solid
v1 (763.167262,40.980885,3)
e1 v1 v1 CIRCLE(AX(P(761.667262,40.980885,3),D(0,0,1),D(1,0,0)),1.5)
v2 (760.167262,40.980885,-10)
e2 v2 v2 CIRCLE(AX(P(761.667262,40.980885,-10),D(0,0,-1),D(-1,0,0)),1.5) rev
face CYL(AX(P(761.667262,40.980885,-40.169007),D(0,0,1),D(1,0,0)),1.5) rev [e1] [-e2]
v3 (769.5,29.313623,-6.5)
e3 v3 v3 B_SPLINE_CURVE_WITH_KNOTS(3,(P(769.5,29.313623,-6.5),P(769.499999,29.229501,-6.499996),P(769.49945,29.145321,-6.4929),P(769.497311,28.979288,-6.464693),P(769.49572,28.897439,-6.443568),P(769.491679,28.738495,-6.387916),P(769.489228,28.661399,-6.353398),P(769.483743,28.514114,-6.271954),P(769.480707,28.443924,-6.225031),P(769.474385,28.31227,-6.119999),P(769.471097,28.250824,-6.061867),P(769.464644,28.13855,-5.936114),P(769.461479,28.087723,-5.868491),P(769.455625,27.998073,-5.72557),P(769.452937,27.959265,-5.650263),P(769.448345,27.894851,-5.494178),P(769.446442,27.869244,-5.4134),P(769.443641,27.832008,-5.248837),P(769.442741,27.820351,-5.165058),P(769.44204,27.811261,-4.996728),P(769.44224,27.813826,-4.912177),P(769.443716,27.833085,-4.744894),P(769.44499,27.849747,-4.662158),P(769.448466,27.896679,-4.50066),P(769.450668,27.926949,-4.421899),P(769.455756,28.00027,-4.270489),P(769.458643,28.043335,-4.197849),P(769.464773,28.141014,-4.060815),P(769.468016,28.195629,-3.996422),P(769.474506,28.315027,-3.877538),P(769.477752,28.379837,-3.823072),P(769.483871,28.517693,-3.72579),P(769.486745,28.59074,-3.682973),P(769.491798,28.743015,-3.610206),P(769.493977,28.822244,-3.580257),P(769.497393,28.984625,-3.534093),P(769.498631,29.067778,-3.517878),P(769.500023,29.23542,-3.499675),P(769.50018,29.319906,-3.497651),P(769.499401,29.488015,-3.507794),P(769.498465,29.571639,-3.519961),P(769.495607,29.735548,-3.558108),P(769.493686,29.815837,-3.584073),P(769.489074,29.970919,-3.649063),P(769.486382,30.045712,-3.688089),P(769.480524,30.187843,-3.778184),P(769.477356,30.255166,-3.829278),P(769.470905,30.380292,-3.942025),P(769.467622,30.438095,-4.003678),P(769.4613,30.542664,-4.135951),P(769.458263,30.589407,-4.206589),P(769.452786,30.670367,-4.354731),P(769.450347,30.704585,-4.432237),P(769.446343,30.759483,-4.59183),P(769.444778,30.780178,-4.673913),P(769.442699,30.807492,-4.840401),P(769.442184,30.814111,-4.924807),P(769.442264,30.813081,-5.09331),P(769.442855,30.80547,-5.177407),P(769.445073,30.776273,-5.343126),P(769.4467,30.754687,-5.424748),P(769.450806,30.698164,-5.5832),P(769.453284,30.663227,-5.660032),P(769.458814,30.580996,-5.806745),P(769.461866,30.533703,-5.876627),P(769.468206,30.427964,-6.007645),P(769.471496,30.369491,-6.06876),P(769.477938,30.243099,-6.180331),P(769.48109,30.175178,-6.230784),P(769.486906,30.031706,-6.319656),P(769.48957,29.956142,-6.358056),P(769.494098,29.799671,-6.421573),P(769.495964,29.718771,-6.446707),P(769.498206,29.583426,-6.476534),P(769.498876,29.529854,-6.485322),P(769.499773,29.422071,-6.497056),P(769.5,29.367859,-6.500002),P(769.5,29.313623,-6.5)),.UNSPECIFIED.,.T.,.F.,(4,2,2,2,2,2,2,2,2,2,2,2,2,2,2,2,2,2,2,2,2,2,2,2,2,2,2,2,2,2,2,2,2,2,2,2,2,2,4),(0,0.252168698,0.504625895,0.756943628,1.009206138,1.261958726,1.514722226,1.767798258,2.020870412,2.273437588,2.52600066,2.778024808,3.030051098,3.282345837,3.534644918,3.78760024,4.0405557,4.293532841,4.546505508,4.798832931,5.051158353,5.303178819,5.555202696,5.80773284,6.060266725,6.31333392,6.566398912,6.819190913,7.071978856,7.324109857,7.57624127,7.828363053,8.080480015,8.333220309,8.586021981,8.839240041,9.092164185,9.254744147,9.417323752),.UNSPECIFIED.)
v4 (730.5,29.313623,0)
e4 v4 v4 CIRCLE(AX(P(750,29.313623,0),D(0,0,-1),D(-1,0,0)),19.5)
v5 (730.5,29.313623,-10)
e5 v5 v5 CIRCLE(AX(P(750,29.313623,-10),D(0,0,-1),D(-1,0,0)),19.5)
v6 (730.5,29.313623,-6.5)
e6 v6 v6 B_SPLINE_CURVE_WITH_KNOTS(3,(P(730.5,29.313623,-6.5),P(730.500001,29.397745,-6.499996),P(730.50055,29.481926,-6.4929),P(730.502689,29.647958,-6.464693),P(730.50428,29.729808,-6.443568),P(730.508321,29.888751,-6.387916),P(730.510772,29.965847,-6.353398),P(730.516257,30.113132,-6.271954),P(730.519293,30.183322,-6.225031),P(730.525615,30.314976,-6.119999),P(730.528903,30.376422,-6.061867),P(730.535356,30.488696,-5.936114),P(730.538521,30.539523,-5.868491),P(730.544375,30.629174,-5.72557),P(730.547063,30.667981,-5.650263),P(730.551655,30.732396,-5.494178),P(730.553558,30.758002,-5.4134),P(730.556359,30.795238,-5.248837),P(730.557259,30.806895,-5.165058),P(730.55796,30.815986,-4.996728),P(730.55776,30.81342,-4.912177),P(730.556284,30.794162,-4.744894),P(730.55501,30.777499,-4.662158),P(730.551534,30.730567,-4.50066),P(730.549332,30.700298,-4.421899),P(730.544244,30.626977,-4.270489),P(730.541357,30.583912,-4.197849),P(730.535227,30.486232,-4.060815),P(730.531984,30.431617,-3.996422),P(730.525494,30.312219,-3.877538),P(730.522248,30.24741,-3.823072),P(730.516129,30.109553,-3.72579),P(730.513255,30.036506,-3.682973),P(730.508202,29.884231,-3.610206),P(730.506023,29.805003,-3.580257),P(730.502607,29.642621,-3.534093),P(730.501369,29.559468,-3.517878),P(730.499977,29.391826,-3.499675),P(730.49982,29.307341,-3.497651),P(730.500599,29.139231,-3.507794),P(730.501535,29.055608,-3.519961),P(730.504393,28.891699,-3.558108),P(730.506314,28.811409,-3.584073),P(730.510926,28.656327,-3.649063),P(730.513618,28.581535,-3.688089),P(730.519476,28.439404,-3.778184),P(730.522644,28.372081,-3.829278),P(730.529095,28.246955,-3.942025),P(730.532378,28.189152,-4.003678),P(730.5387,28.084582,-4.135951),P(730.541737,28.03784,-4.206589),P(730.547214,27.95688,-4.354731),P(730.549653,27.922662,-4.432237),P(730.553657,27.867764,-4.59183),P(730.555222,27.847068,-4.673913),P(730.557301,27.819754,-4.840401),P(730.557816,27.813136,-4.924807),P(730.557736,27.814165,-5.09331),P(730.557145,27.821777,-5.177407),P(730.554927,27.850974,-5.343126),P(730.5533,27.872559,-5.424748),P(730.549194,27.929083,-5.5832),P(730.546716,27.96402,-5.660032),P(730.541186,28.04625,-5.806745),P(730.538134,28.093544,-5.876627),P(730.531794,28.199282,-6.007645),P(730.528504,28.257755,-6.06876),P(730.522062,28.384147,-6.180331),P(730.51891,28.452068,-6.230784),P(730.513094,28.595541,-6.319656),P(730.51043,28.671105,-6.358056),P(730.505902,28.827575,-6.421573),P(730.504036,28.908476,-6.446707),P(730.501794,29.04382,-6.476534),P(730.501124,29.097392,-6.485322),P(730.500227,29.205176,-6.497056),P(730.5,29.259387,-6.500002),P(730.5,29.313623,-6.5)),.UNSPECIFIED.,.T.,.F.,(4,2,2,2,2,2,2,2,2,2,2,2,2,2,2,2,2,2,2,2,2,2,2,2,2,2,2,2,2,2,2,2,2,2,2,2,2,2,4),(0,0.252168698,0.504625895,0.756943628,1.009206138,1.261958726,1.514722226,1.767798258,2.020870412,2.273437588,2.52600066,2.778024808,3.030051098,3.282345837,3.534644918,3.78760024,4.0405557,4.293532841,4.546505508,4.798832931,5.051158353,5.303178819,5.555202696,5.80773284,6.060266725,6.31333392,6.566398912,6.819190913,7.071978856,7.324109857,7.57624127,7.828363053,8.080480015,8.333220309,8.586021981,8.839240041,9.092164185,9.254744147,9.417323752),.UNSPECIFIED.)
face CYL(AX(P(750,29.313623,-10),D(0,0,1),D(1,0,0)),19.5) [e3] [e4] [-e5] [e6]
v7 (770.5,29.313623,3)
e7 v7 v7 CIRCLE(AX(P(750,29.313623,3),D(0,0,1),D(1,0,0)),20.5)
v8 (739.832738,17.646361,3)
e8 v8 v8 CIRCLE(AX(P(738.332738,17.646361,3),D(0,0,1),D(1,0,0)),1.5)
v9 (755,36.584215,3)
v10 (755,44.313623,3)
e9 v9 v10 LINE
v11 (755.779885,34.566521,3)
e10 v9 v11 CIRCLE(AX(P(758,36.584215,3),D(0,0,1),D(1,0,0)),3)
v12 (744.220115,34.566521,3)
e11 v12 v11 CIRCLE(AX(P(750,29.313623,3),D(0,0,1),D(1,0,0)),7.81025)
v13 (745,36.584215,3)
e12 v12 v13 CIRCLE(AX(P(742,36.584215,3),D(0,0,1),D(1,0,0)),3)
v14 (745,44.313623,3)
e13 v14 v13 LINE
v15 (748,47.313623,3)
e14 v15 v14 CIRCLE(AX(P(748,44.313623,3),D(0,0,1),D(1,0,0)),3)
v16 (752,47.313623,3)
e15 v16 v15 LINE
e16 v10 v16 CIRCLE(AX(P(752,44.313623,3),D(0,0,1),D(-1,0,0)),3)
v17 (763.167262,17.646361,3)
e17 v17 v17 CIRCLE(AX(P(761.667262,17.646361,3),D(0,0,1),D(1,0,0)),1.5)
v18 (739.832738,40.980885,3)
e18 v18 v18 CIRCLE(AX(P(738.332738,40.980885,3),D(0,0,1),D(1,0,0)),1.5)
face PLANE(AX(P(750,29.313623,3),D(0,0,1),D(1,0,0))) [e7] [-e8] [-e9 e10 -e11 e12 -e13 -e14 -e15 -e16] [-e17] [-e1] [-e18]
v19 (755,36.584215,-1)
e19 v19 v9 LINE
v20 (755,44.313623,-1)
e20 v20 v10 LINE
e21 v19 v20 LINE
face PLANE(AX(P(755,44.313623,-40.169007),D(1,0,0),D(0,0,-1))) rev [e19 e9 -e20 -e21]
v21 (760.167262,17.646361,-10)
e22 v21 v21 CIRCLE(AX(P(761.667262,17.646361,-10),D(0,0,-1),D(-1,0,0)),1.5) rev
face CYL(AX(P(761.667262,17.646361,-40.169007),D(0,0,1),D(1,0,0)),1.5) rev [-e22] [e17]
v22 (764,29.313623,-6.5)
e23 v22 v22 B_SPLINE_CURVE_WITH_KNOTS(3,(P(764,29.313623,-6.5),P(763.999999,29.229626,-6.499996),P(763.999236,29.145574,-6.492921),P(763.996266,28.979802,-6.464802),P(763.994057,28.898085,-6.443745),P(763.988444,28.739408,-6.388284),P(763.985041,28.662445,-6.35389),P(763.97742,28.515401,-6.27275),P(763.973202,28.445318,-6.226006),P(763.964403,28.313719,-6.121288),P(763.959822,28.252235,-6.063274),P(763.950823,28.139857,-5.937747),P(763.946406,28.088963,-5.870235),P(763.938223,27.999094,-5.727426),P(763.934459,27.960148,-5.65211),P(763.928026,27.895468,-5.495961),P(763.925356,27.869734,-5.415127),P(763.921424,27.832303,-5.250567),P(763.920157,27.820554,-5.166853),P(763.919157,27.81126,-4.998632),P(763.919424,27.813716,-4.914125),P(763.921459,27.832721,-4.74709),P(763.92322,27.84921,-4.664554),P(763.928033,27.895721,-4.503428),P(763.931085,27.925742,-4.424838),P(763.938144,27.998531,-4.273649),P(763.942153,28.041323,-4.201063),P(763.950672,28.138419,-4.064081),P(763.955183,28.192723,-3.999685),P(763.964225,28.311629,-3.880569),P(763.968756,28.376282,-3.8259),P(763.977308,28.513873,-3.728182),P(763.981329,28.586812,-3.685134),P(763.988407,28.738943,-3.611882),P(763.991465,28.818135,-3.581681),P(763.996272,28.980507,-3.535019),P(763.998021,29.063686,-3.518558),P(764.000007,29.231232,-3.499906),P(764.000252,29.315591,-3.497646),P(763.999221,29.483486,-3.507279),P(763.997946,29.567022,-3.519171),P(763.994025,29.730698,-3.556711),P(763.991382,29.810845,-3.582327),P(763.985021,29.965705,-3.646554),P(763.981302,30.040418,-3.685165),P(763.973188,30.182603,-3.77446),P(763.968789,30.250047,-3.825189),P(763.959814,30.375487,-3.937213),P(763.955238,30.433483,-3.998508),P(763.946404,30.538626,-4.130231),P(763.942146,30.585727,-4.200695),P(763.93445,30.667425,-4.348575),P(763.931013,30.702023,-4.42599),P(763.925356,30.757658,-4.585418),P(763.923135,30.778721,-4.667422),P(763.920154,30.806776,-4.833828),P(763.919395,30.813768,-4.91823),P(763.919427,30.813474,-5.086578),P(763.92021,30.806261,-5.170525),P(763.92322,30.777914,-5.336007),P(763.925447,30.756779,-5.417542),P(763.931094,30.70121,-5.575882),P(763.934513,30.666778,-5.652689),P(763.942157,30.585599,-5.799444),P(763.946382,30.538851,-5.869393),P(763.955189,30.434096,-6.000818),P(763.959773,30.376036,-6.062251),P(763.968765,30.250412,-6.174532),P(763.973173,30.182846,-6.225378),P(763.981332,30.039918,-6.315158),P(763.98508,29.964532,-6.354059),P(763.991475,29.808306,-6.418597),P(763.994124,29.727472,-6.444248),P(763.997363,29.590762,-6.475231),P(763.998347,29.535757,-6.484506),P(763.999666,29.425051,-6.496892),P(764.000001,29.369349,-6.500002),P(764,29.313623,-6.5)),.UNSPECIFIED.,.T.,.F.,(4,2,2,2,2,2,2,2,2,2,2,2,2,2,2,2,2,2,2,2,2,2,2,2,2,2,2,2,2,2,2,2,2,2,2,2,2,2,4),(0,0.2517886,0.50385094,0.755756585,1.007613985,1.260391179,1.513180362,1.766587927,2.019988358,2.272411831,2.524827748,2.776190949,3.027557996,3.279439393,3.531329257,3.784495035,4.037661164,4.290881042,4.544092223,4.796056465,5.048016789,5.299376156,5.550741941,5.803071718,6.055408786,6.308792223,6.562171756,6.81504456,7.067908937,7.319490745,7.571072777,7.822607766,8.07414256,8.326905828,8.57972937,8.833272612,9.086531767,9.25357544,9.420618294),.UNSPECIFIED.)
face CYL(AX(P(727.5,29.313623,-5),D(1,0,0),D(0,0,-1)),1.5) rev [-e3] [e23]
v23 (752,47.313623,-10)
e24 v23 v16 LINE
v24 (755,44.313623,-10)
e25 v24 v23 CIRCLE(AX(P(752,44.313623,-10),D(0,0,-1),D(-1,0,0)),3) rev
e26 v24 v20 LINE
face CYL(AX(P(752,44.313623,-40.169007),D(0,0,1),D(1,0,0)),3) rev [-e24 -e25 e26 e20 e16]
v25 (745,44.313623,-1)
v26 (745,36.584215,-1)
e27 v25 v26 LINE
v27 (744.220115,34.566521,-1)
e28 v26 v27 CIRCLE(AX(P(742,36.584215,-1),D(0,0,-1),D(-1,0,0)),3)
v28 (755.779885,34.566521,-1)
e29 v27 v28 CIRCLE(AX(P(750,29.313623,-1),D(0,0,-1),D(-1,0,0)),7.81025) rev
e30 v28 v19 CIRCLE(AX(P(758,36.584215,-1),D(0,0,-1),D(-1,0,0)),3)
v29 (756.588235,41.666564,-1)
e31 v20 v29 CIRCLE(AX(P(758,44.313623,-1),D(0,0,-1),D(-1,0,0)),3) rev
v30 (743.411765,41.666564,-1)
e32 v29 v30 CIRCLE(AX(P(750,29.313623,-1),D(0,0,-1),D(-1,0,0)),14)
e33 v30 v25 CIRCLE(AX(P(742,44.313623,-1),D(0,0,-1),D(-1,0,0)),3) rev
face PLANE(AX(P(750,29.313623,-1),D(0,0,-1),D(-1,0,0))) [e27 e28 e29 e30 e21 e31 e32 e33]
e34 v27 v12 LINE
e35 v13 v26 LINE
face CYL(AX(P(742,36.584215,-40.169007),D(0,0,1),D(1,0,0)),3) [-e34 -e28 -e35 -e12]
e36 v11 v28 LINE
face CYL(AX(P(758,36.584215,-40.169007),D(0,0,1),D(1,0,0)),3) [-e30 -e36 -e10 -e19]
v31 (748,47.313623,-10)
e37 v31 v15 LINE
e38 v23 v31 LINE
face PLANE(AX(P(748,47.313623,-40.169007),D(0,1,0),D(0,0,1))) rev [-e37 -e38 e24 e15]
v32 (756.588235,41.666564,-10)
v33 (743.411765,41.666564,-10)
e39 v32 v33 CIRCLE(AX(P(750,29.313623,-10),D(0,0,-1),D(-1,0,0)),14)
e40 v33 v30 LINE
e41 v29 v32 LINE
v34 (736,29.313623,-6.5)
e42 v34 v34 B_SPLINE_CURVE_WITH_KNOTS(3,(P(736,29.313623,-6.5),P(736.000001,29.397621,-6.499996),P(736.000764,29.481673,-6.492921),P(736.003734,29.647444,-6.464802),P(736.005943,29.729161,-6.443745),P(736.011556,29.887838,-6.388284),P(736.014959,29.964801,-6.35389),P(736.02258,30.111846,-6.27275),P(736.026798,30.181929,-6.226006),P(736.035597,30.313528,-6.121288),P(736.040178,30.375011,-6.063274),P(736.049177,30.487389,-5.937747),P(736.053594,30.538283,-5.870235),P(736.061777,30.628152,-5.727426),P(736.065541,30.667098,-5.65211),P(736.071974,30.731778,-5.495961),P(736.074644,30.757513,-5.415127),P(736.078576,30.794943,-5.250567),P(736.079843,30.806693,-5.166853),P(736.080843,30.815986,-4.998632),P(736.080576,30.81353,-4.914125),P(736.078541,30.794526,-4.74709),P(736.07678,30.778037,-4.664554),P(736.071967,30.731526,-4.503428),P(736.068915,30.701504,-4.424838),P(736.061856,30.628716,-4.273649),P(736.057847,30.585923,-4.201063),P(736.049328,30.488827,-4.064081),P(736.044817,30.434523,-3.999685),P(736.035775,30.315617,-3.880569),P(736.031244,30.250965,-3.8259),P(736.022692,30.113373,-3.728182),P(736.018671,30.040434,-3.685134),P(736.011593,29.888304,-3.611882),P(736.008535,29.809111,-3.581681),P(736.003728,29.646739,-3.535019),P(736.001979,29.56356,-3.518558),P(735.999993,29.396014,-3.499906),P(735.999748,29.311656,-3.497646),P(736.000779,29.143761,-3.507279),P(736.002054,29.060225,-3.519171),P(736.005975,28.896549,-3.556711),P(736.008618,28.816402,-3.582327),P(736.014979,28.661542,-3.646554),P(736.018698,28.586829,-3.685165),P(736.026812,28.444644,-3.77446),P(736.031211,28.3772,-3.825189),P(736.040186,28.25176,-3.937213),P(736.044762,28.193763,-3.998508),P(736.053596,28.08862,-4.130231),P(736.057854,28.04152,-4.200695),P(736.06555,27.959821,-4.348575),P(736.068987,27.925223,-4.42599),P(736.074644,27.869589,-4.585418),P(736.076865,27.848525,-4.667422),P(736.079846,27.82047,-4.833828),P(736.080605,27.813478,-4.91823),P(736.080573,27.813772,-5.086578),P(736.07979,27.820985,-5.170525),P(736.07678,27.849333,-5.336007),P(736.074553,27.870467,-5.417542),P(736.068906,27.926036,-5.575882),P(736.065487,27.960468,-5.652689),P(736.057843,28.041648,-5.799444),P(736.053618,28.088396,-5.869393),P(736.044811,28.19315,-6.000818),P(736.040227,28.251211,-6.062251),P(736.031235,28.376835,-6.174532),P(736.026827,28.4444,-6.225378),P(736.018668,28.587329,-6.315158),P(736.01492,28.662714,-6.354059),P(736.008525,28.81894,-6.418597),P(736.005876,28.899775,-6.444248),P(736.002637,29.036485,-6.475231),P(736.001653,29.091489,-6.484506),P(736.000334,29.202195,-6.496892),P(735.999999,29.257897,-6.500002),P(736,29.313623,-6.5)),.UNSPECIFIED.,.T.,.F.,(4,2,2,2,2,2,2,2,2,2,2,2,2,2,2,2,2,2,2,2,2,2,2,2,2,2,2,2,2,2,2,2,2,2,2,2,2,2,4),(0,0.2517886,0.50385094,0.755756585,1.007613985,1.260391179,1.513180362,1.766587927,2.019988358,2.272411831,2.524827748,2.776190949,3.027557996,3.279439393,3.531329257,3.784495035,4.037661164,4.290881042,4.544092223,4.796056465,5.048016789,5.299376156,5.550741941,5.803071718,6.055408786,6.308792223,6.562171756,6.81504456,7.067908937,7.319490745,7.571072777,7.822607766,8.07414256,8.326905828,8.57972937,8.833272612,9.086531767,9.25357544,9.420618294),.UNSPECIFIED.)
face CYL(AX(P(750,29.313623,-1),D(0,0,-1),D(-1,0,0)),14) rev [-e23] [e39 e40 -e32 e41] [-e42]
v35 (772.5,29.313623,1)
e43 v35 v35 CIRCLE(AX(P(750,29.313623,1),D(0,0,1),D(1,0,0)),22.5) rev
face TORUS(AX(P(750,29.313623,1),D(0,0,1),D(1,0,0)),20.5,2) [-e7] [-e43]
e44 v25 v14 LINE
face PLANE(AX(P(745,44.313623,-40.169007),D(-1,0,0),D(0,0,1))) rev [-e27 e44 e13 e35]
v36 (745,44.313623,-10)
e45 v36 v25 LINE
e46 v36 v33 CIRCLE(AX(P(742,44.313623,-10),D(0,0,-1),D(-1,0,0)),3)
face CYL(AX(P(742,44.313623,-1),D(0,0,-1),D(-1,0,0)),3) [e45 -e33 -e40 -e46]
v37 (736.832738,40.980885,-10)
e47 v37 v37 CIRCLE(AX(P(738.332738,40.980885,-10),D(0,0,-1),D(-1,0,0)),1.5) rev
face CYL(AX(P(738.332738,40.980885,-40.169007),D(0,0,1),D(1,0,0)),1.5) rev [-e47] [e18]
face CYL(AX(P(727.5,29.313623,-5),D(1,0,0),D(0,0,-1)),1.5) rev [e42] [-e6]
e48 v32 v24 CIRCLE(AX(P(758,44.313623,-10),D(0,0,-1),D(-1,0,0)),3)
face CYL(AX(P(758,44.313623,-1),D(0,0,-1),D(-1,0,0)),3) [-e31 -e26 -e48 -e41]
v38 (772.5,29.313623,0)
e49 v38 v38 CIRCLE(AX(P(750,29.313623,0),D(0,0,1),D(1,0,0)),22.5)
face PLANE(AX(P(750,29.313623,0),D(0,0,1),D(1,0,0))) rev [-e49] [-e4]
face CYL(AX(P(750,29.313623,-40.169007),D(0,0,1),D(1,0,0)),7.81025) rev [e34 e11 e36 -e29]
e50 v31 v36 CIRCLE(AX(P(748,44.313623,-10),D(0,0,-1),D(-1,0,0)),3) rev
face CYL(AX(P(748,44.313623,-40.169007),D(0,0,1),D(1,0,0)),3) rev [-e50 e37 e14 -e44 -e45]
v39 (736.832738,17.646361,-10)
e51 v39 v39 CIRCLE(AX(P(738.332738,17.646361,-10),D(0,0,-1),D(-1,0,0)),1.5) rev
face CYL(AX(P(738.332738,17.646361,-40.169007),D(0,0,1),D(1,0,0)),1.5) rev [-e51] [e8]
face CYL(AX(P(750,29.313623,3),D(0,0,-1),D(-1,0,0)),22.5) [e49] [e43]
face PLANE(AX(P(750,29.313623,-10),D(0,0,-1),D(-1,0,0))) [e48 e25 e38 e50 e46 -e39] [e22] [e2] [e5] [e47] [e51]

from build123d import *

# Parameters (mm, degrees)
SKETCH1_R               = 22.5
BOSS_EXTRUDE1_DEPTH     = 3
SKETCH2_R               = 19.5
BOSS_EXTRUDE2_DEPTH     = 10
SKETCH3_R               = 1.5
CUT_EXTRUDE1_DEPTH      = 13
CUT_EXTRUDE2_DEPTH      = 60.505474974
CUT_EXTRUDE2_DEPTH_BACK = 60.505474974
SKETCH4_R               = 1.5
SKETCH5_R               = 14
CUT_EXTRUDE3_DEPTH      = 9
FILLET1_R               = 3
FILLET2_R               = 2


with BuildPart() as part:
    # Sketch1 → Boss-Extrude1 (new body)
    with BuildSketch(Plane.XY):
        with Locations((750, 29.313623227)):
            Circle(SKETCH1_R)
    extrude(amount=BOSS_EXTRUDE1_DEPTH)

    # Sketch2 → Boss-Extrude2 (add)
    with BuildSketch(Plane(origin=(0, 0, 0), x_dir=(-1, 0, 0), z_dir=(0, 0, -1))):
        with Locations((-750, 29.313623227)):
            Circle(SKETCH2_R)
    extrude(amount=BOSS_EXTRUDE2_DEPTH)

    # Sketch3 → Cut-Extrude1 (cut)
    with BuildSketch(Plane.XY.offset(3)):
        with Locations((761.66726189, 17.646361337)):
            Circle(SKETCH3_R)
        with Locations((738.33273811, 17.646361337)):
            Circle(SKETCH3_R)
        with Locations((738.33273811, 40.980885116)):
            Circle(SKETCH3_R)
        with Locations((761.66726189, 40.980885116)):
            Circle(SKETCH3_R)
        with BuildLine():
            Line((748, 47.313623227), (752, 47.313623227))
            ThreePointArc((752, 47.313623227), (754.121320344, 46.43494357), (755, 44.313623227))
            Line((755, 44.313623227), (755, 35.313623227))
            ThreePointArc((755, 35.313623227), (750, 21.503373551), (745, 35.313623227))
            Line((745, 35.313623227), (745, 44.313623227))
            ThreePointArc((745, 44.313623227), (745.878679656, 46.43494357), (748, 47.313623227))
        make_face()
    extrude(amount=-CUT_EXTRUDE1_DEPTH, mode=Mode.SUBTRACT)

    # Sketch4 → Cut-Extrude2 (cut, two sides: drawn at the far end of the back side and taken through both)
    with BuildSketch(Plane(origin=(745, 0, 0), x_dir=(0, 0, -1), z_dir=(1, 0, 0)).offset(-CUT_EXTRUDE2_DEPTH_BACK)):
        with Locations((5, 29.313623227)):
            Circle(SKETCH4_R)
    extrude(amount=CUT_EXTRUDE2_DEPTH + CUT_EXTRUDE2_DEPTH_BACK, mode=Mode.SUBTRACT)

    # Sketch5 → Cut-Extrude3 (cut)
    with BuildSketch(Plane(origin=(0, 0, -10), x_dir=(-1, 0, 0), z_dir=(0, 0, -1))):
        with Locations((-750, 29.313623227)):
            Circle(SKETCH5_R)
    extrude(amount=-CUT_EXTRUDE3_DEPTH, mode=Mode.SUBTRACT)

    # Fillet1
    fillet1_edges = [part.edges().sort_by_distance(p)[0] for p in [
        (755, 35.313623227, 1),
        (745, 35.313623227, 1),
        (755, 42.390320057, -5.5),
        (745, 42.390320057, -5.5),
    ]]
    fillet(fillet1_edges, radius=FILLET1_R - 0.0001)  # a hair under: the kernel refuses the full size

    # Fillet2
    fillet2_edges = [part.edges().sort_by_distance(p)[0] for p in [
        (727.5, 29.313623227, 3),
    ]]
    fillet(fillet2_edges, radius=FILLET2_R)


solid = part.part
